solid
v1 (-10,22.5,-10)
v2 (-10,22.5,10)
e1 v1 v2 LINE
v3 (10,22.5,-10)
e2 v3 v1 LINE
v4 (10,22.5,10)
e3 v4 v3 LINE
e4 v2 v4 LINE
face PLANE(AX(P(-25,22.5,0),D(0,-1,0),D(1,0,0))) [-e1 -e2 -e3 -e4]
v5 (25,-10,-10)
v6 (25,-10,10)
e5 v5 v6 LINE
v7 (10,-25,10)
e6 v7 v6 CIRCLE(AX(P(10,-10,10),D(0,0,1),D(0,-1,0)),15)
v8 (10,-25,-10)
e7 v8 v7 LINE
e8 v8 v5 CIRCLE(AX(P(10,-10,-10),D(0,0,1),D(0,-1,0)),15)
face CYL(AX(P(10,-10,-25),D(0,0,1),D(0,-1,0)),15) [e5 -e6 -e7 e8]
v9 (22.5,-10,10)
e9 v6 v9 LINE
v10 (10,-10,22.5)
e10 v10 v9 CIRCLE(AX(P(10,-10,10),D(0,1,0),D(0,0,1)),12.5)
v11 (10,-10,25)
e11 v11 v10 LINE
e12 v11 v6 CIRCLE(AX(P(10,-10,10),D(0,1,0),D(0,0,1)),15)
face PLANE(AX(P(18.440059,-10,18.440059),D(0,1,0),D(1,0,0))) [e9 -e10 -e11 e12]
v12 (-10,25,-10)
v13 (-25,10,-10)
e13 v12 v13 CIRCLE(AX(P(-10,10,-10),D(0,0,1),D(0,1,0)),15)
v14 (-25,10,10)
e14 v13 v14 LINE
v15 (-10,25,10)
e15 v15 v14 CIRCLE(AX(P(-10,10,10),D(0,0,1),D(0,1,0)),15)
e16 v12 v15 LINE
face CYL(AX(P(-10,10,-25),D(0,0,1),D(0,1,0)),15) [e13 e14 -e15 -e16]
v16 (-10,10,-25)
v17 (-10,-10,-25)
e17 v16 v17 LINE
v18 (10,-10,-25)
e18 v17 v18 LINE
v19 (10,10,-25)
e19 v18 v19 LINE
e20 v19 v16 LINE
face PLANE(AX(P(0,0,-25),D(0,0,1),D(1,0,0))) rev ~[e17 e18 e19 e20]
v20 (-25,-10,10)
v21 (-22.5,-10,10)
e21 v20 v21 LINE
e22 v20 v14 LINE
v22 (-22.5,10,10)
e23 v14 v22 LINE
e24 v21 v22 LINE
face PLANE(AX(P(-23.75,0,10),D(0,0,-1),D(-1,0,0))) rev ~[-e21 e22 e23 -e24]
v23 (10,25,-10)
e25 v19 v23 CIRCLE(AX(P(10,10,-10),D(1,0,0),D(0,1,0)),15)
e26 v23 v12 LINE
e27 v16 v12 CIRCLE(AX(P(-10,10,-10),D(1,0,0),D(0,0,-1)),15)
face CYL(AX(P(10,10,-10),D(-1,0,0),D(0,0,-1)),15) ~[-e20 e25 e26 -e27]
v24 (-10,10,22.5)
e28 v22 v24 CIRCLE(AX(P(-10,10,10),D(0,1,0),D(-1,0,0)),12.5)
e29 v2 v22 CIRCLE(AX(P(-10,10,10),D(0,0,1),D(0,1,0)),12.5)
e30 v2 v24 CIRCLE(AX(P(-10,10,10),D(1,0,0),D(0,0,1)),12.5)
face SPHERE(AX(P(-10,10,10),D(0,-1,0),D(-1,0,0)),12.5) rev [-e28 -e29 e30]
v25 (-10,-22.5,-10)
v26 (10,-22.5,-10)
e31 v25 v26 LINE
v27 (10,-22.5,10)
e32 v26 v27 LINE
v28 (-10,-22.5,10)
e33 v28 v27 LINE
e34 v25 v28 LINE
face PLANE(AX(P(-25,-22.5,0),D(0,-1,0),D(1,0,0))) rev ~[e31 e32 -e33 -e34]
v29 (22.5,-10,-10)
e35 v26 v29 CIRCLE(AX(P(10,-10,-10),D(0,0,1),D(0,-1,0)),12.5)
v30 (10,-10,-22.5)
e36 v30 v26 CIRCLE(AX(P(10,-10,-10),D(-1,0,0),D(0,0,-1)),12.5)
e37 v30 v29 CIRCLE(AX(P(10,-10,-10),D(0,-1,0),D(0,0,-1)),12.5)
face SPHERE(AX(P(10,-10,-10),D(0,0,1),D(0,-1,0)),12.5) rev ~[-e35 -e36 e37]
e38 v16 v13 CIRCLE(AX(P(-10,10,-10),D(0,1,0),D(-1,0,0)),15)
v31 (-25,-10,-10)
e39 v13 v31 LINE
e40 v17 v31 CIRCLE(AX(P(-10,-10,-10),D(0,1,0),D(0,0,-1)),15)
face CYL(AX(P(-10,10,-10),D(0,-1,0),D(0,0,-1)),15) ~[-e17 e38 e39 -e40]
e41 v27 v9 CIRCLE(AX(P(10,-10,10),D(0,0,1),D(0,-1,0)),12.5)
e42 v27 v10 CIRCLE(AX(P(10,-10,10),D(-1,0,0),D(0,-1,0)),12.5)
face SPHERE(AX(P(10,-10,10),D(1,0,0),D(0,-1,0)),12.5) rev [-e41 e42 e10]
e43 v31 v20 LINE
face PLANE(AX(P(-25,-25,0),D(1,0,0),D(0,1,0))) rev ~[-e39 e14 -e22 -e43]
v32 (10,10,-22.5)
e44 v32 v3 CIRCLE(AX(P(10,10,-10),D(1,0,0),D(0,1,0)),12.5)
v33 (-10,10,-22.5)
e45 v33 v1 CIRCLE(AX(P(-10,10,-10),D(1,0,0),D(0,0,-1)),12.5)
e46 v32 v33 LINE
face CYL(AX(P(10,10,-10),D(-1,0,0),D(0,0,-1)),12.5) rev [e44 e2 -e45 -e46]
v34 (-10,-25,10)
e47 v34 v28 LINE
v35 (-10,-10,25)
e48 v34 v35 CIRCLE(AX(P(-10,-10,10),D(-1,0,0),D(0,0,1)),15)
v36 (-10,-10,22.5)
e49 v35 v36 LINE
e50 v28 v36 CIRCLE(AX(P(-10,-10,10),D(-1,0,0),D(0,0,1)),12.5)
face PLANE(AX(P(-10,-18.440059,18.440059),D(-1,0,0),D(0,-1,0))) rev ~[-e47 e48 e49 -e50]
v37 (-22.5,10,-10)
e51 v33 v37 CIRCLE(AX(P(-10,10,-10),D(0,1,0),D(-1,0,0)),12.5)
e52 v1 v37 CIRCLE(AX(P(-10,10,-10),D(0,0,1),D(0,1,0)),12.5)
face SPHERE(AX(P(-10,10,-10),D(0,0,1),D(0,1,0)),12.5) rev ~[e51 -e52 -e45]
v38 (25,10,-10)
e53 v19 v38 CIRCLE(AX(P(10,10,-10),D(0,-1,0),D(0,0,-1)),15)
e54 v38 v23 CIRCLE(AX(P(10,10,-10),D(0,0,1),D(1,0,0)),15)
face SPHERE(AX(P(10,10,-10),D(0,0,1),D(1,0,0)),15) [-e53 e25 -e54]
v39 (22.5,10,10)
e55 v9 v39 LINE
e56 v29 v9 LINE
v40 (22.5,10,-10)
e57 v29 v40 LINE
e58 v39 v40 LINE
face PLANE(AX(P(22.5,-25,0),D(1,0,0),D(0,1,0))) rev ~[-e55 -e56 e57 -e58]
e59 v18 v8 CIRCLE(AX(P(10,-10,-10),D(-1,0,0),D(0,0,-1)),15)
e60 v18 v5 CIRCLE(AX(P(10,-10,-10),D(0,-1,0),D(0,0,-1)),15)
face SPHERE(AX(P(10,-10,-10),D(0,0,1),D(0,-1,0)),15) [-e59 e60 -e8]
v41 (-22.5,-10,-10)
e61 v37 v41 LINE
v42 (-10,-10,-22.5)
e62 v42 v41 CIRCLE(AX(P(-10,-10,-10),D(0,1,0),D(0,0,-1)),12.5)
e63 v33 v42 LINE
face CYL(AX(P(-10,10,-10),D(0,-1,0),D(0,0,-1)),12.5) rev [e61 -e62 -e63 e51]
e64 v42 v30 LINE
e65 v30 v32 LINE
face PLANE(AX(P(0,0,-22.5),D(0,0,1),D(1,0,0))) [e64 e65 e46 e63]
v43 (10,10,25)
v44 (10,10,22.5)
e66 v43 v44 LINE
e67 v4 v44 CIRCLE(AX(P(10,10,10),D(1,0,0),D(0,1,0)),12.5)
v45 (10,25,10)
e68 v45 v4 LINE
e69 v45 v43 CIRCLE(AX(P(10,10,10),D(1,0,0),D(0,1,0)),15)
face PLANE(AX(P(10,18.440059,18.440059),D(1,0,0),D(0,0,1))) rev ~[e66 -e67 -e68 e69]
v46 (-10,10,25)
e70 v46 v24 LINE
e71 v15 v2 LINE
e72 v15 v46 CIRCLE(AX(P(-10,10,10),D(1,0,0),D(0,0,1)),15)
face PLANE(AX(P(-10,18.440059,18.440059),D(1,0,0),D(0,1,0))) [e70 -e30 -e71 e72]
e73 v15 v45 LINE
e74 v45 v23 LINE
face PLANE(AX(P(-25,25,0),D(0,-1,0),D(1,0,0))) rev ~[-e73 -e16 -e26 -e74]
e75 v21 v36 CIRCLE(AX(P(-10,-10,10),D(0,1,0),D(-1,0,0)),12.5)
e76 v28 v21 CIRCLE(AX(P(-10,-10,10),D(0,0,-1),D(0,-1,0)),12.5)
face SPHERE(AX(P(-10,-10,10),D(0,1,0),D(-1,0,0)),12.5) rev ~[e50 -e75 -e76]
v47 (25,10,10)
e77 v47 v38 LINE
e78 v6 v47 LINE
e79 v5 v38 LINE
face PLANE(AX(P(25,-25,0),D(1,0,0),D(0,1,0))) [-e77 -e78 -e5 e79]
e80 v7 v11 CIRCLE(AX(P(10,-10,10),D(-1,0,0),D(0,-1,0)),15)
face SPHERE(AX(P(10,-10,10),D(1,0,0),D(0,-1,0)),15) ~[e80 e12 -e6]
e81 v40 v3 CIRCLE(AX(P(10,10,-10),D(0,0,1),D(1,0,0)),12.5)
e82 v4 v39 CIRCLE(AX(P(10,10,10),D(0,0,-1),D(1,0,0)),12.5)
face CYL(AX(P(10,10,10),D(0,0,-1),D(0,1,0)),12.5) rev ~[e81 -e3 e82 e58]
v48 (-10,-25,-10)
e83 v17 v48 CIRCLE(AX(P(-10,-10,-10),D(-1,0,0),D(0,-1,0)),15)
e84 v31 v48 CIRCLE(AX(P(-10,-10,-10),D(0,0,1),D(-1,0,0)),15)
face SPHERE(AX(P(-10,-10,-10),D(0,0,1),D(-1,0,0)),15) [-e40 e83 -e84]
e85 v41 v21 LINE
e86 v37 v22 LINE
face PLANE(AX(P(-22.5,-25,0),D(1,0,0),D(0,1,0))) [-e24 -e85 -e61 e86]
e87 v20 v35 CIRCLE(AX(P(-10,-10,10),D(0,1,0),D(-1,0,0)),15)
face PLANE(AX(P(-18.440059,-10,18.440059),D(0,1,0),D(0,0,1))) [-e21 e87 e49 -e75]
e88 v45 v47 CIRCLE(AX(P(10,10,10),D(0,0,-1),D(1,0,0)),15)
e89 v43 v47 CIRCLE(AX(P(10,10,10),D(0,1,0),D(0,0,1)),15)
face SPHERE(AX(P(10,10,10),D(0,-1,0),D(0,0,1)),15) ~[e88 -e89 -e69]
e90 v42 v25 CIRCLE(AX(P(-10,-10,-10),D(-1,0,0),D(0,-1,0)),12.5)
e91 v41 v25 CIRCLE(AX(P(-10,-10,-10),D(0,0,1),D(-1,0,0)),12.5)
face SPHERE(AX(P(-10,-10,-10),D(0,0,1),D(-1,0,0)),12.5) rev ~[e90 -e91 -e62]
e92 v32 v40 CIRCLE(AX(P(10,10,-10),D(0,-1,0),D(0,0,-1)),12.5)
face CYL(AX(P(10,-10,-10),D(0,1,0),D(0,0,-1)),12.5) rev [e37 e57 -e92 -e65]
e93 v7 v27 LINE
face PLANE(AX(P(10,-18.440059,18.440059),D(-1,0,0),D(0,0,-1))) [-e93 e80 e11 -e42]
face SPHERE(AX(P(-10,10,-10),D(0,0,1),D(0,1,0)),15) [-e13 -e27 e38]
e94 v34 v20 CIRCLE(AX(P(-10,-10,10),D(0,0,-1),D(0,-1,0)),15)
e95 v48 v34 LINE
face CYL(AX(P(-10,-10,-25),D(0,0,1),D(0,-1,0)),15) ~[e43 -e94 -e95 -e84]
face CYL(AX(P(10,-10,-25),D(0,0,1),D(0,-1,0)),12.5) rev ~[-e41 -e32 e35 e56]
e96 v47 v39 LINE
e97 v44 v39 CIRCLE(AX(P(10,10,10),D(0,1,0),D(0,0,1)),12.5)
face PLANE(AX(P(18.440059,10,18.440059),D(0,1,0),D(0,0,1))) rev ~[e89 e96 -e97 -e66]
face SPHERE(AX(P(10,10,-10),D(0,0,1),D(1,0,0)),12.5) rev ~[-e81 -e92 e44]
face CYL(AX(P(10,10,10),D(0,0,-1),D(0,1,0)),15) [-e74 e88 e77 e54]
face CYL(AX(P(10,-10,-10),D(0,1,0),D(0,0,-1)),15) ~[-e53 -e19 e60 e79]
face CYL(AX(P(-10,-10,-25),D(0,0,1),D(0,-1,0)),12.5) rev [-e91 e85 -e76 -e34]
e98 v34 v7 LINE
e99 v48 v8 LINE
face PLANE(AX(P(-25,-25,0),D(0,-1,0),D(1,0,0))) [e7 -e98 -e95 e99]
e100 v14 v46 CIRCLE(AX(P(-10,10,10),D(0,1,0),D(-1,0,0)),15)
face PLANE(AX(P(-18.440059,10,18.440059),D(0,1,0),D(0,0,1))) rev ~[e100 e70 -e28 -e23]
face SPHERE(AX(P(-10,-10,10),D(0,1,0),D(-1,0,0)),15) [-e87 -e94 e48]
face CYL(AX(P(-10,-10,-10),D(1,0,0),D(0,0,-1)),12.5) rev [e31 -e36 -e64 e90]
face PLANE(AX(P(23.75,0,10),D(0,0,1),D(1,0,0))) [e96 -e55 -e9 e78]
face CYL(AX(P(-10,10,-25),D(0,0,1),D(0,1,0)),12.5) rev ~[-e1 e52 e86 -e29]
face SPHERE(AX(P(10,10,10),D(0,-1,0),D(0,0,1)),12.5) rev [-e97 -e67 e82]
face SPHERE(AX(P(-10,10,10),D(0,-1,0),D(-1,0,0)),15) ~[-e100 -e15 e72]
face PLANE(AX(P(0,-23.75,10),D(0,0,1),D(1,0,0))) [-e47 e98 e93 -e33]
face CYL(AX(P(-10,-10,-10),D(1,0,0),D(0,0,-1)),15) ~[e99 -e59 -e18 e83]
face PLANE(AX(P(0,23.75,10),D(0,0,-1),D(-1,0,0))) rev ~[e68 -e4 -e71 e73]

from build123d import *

# Parameters (mm, degrees)
F0_W     = 50
F0_H     = 50
F1_DEPTH = 25
F2_R     = 15
F3_R     = 15
F4_R     = 15
F5_R     = 15
F6_R     = 15
F7_T     = 2.5


# Not quite as in the source:
# - a shell that OpenCascade refuses in one call is made with other operations: the cavity is built on its own and cut out


with BuildPart() as f1:
    # F0 (on Top) → F1 (new body, symmetric)
    with BuildSketch(Plane.XY):
        Rectangle(F0_W, F0_H)
    extrude(amount=F1_DEPTH, both=True)

    # F2
    f2_edges = [f1.edges().sort_by_distance(p)[0] for p in [
        (-25, 0, 25),
    ]]
    fillet(f2_edges, radius=F2_R)

    # F3
    f3_edges = [f1.edges().sort_by_distance(p)[0] for p in [
        (7.5, -25, 25),
    ]]
    fillet(f3_edges, radius=F3_R)

    # F4
    f4_edges = [f1.edges().sort_by_distance(p)[0] for p in [
        (25, 7.5, 25),
    ]]
    fillet(f4_edges, radius=F4_R)

    # F5
    f5_edges = [f1.edges().sort_by_distance(p)[0] for p in [
        (0, 25, 25),
    ]]
    fillet(f5_edges, radius=F5_R)

    # F6
    f6_edges = [f1.edges().sort_by_distance(p)[0] for p in [
        (25, 0, -25),
    ]]
    fillet(f6_edges, radius=F6_R)

    # F7: shell of thickness 2.5, made by hand


with BuildPart() as f7_core1:
    # F7_t2: copy of F1
    add(f1.part)

    # the walls: a layer under each face that stays
    f7_faces = [f7_core1.faces().sort_by_distance(p)[0] for p in [
        (0, 0, -25),
        (20.6066017178, 0, -20.6066017178),
        (0, -20.6066017178, -20.6066017178),
        (0, 20.6066017178, -20.6066017178),
        (-20.6066017178, 0, -20.6066017178),
        (17.5, -17.5, -20.6066017178),
        (25, 0, 0),
        (17.5, 17.5, -20.6066017178),
        (-17.5, -17.5, -20.6066017178),
        (0, -25, 0),
        (0, 25, 0),
        (-17.5, 17.5, -20.6066017178),
        (-25, 0, 0),
        (20.6066017178, -20.6066017178, 0),
        (20.6066017178, 20.6066017178, 0),
        (-20.6066017178, -20.6066017178, 0),
        (-20.6066017178, 20.6066017178, 0),
        (20.6066017178, -17.5, 17.5),
        (17.5, 20.6066017178, 17.5),
        (-17.5, -20.6066017178, 17.5),
        (-17.5, 20.6066017178, 17.5),
    ]]
    thicken(f7_faces, amount=-F7_T, mode=Mode.SUBTRACT)


with BuildPart() as f1_1:
    add(f1.part)

    # what is left inside the walls is the cavity
    f7_cavity = [f7_core1.part.solids().sort_by_distance(p)[0] for p in [
        (3.333333, 20.588924, 20.588924),
    ]]
    add(f7_cavity, mode=Mode.SUBTRACT)


solid = f1_1.part
